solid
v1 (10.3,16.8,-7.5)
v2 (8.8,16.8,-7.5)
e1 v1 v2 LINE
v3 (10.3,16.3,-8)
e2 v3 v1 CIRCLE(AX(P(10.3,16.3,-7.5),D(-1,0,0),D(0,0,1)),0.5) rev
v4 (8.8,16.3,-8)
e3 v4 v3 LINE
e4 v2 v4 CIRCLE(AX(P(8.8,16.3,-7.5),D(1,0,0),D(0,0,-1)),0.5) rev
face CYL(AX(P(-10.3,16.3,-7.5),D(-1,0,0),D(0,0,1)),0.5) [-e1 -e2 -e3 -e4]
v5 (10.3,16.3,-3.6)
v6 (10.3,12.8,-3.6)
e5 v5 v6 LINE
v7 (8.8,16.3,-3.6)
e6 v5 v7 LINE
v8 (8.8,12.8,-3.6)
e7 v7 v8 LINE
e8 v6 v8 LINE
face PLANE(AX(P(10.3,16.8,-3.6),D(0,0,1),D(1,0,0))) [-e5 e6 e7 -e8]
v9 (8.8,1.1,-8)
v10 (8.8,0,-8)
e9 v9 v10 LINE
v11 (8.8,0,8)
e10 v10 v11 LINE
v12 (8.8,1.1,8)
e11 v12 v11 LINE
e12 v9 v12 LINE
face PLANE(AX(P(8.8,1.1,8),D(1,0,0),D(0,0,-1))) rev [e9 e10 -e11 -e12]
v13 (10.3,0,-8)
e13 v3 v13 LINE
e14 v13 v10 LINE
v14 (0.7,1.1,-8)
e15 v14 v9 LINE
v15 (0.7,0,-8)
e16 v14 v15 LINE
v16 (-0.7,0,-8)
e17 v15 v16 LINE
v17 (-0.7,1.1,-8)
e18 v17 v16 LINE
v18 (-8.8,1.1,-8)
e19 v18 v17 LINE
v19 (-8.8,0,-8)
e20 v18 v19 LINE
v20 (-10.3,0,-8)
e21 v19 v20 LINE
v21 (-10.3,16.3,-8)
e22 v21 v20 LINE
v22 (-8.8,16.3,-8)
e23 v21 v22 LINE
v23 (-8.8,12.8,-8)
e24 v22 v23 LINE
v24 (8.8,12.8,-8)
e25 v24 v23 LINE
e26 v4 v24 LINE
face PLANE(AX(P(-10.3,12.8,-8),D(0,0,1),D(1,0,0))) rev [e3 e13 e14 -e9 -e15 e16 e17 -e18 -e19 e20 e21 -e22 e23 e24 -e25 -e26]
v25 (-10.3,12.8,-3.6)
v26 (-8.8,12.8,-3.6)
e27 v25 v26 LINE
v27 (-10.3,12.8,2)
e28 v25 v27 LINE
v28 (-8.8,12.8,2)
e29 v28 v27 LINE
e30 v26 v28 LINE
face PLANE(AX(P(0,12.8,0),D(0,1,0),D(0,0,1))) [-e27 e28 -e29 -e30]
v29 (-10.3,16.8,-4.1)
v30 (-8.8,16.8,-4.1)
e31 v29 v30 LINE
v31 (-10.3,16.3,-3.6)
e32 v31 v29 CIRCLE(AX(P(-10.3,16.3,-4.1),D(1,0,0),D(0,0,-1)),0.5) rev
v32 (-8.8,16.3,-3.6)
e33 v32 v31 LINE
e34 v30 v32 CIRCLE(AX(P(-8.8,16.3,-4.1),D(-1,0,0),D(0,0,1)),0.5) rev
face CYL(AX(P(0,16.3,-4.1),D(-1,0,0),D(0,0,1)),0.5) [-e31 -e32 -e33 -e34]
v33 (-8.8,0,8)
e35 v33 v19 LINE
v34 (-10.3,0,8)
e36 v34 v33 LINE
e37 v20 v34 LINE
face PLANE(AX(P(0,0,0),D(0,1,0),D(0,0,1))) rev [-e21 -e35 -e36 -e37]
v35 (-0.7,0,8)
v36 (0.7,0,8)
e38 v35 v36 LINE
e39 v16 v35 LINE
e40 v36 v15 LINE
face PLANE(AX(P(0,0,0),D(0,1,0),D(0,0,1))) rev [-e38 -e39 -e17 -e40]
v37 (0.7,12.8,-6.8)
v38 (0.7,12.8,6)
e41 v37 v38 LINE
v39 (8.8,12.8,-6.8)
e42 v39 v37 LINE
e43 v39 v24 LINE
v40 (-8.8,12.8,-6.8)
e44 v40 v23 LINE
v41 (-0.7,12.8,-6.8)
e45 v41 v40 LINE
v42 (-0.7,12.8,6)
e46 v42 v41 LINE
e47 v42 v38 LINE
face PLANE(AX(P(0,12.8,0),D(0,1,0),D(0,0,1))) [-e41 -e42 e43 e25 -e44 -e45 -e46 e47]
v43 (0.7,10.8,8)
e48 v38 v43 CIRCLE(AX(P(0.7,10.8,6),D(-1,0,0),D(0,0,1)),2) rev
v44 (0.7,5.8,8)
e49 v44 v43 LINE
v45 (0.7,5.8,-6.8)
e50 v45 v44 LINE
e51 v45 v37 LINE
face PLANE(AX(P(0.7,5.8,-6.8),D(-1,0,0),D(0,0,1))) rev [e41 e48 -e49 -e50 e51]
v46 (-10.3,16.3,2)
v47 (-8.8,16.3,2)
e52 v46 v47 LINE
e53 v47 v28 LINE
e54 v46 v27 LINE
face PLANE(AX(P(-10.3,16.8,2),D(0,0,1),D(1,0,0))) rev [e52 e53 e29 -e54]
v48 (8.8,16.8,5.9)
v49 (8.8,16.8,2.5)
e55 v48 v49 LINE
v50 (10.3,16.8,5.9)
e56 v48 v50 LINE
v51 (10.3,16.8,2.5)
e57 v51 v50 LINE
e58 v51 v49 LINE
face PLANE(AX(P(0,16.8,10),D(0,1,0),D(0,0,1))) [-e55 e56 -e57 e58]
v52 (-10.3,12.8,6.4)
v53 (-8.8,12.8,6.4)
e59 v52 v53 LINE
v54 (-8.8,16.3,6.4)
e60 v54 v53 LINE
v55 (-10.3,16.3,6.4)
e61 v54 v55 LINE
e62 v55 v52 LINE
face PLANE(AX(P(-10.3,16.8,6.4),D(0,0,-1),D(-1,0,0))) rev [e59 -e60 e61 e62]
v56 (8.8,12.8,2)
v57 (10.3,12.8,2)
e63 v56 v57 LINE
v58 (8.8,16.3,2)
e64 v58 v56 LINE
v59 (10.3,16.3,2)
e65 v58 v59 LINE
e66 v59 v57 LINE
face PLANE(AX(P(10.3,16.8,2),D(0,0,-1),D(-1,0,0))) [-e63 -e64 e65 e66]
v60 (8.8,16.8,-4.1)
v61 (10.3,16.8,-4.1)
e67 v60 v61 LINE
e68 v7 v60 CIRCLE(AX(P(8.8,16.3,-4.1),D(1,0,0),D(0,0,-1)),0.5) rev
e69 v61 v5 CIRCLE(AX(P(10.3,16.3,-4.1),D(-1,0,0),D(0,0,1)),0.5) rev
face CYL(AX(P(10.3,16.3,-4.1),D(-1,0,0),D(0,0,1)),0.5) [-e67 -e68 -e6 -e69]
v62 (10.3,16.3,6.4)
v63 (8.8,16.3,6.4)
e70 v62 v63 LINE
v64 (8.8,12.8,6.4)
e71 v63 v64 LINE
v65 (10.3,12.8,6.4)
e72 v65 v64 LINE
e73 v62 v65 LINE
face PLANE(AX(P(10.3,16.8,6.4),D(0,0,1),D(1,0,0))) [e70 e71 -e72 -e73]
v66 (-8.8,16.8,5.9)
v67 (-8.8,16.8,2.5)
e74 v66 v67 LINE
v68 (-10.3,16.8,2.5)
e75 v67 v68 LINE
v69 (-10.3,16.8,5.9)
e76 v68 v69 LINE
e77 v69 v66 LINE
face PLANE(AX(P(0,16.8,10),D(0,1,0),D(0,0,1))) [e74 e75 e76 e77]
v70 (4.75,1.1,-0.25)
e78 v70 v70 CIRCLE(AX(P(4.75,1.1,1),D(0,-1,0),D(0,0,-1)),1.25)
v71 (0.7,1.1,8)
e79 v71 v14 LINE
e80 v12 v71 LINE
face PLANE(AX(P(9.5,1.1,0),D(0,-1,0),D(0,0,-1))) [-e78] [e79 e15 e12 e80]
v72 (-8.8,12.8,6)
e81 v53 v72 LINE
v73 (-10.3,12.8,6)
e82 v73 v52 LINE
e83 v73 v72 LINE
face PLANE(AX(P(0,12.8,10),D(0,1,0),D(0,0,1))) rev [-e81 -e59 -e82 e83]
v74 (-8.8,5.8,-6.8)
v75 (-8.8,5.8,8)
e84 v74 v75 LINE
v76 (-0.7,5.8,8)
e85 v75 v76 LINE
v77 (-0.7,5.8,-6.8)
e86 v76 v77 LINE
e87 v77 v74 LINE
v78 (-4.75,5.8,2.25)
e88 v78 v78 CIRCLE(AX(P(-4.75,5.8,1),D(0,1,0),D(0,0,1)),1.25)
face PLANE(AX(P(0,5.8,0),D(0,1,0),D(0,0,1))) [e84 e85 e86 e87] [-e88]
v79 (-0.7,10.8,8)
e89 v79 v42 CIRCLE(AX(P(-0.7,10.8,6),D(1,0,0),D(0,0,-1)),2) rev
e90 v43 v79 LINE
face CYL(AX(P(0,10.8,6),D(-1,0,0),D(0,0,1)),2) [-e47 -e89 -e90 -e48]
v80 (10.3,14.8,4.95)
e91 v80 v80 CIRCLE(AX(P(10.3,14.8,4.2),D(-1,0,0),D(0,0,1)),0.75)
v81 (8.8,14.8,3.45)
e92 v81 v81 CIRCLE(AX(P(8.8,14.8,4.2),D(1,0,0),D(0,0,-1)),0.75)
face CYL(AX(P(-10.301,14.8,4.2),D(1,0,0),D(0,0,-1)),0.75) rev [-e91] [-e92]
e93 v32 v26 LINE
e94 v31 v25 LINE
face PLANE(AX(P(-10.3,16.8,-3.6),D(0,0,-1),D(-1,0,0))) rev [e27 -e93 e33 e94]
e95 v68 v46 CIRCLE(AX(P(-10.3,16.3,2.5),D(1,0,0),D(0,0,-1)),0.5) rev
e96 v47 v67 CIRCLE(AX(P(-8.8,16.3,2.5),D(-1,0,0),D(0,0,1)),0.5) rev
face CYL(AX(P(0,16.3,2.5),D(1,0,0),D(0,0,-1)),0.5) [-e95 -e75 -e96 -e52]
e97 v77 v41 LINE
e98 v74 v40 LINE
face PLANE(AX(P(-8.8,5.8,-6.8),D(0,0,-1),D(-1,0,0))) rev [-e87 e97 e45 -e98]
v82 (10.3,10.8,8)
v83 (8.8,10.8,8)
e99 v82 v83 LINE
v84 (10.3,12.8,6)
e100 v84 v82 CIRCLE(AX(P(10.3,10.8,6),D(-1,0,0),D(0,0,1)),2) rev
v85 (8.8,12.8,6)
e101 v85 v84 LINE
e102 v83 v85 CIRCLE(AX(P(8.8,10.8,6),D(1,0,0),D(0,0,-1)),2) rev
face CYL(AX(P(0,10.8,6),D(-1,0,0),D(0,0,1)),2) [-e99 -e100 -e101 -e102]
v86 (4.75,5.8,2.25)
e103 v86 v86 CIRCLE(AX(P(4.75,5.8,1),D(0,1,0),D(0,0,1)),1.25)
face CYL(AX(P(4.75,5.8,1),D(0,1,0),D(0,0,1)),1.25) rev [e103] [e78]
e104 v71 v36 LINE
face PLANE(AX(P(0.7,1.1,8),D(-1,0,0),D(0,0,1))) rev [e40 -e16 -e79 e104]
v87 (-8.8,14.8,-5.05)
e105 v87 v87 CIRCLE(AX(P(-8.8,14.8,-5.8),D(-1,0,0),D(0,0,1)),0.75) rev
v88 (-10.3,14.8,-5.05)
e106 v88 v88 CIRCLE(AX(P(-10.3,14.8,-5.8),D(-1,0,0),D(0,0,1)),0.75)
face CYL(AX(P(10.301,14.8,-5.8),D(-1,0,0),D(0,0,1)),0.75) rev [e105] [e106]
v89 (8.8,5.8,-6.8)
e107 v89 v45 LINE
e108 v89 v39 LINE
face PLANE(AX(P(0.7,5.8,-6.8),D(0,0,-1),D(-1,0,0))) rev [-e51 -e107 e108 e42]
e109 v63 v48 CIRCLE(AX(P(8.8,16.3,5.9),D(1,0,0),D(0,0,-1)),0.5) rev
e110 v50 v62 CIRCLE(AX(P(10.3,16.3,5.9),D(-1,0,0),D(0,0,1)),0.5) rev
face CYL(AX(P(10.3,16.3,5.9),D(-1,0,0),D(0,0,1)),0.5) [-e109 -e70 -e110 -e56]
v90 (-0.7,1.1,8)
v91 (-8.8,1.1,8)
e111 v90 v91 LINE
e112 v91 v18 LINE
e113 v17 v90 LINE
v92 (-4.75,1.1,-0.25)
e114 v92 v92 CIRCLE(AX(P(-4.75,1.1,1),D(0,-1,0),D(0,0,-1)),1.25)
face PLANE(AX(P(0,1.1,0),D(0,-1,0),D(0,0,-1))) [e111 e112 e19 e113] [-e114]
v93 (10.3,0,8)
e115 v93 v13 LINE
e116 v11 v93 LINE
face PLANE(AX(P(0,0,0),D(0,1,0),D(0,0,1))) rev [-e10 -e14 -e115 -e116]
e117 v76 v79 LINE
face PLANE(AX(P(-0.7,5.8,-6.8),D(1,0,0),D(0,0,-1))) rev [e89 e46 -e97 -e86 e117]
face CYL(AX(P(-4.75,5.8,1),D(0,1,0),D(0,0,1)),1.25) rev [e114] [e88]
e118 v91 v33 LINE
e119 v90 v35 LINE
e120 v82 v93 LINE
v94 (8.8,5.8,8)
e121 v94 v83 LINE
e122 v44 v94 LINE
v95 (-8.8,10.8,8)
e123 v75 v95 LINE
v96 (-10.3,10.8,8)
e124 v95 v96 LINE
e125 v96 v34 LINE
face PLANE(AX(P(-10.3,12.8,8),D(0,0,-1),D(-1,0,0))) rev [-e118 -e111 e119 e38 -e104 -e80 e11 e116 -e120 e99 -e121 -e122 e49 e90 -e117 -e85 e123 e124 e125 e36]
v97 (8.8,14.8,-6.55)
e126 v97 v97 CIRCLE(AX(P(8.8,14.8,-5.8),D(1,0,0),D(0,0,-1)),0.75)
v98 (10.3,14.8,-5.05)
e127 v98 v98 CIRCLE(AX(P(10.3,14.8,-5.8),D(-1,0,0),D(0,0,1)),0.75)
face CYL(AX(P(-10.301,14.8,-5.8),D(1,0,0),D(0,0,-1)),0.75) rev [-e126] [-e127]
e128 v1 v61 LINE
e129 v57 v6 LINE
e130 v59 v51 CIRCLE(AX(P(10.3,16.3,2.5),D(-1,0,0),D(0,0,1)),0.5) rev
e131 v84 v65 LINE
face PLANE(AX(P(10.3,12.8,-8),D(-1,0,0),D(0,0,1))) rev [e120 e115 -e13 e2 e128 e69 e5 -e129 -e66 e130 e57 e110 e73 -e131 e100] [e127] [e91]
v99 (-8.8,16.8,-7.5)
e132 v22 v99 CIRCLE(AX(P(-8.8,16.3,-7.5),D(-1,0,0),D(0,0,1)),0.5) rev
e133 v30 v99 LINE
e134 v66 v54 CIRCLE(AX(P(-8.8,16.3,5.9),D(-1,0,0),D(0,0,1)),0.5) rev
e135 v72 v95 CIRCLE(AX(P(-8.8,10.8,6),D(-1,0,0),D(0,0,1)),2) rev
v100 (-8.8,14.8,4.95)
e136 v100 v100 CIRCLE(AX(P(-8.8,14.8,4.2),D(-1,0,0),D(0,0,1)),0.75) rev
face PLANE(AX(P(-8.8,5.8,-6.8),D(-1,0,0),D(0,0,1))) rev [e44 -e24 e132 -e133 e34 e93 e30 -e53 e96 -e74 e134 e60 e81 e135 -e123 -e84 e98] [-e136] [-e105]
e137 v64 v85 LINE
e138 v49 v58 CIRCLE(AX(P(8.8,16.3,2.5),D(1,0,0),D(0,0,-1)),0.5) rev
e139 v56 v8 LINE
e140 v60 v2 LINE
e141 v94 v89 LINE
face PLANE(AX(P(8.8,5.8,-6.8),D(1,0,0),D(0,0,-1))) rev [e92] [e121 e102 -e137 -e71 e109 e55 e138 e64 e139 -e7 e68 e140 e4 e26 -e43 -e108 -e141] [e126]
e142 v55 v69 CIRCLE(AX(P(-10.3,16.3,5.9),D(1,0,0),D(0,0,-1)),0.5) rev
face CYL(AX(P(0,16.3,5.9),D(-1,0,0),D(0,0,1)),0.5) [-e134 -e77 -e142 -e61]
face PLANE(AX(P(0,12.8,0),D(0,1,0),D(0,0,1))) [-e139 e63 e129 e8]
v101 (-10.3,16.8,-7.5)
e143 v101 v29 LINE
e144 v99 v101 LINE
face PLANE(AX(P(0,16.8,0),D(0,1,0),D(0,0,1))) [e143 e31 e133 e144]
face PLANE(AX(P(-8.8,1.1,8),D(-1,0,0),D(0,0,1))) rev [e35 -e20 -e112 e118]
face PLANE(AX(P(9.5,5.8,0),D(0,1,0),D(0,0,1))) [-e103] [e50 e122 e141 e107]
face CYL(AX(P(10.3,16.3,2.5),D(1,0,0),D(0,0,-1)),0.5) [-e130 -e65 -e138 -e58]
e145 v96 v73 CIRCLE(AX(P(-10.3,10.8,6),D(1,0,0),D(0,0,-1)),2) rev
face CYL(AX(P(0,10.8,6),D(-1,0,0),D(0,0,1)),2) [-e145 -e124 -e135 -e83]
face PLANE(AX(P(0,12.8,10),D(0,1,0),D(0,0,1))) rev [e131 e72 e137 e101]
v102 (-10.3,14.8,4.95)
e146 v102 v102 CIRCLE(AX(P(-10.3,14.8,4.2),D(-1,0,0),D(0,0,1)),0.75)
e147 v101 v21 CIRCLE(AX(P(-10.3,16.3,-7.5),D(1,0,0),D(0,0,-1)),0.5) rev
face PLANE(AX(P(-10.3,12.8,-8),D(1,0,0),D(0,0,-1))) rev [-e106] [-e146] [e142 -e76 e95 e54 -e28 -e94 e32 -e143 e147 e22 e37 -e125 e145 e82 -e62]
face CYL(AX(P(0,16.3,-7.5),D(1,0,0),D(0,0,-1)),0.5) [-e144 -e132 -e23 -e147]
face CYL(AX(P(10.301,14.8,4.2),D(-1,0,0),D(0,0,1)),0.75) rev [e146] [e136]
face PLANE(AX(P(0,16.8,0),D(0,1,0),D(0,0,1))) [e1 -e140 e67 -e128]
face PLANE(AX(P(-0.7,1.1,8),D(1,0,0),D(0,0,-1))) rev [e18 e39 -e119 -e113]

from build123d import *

# Parameters (mm, degrees)
SKETCH1_W                 = 20.6
SKETCH1_H                 = 16
BOSS_EXTRUDE1_DEPTH       = 12.8
SKETCH2_W                 = 8.1
SKETCH2_H                 = 16
BOTTOM_CUT_DEPTH          = 1.1
FILL_PATTERN1_OUTLINE_W   = 8.1
FILL_PATTERN1_OUTLINE_H   = 16
FILL_PATTERN1_DEPTH       = 1.1
FILLET1_R                 = 2
SKETCH3_W                 = 8.1
SKETCH3_H                 = 14.8
TOP_CUT_DEPTH             = 7
M3X0_5_TAPPED_HOLE1_D     = 2.5
FILL_START                = 5.8
FILL_PATTERN2_OUTLINE_W   = 8.1
FILL_PATTERN2_OUTLINE_H   = 14.8
FILL_PATTERN2_DEPTH       = 7
FILL_START_2              = 1.1
FILL_PATTERN2_2_OUTLINE_R = 1.25
FILL_PATTERN2_2_DEPTH     = 4.7
SKETCH7_W                 = 1.5
SKETCH7_H                 = 4.4
BOSS_EXTRUDE2_DEPTH       = 4
CUT_EXTRUDE1_REACH        = 29.76
SKETCH8_R                 = 0.75
FILLET2_R                 = 0.5
LPATTERN1_COUNT           = 2
LPATTERN1_PITCH           = 10
FILLET2_OF_LPATTERN1_R    = 0.5
MIRROR1_START             = 8.8
MIRROR1_OUTLINE_R         = 0.75
MIRROR1_DEPTH             = 1.5


# Read off the part's stored shape, not the designer's step: Fill Pattern1, Fill Pattern2, Mirror1
with BuildPart() as part:
    # Sketch1 → Boss-Extrude1 (new body)
    with BuildSketch(Plane(origin=(0, 0, 0), x_dir=(1, 0, 0), z_dir=(0, 1, 0))):
        Rectangle(SKETCH1_W, SKETCH1_H)
    extrude(amount=BOSS_EXTRUDE1_DEPTH)

    # Sketch2 → BOTTOM CUT (cut)
    with BuildSketch(Plane.XZ):
        with Locations((-4.75, 0)):
            Rectangle(SKETCH2_W, SKETCH2_H)
    extrude(amount=-BOTTOM_CUT_DEPTH, mode=Mode.SUBTRACT)

    # Fill Pattern1 outline → Fill Pattern1 (cut)
    with BuildSketch(Plane(origin=(0, 0, 0), x_dir=(1, 0, 0), z_dir=(0, 1, 0))):
        with Locations((4.75, 0)):
            Rectangle(FILL_PATTERN1_OUTLINE_W, FILL_PATTERN1_OUTLINE_H)
    extrude(amount=FILL_PATTERN1_DEPTH, mode=Mode.SUBTRACT)

    # Fillet1
    fillet1_edges = [part.edges().sort_by_distance(p)[0] for p in [
        (0, 12.8, 8),
    ]]
    fillet(fillet1_edges, radius=FILLET1_R)

    # Sketch3 → TOP CUT (cut)
    with BuildSketch(Plane(origin=(0, 12.8, 0), x_dir=(1, 0, 0), z_dir=(0, 1, 0))):
        with Locations((-4.75, -0.6)):
            Rectangle(SKETCH3_W, SKETCH3_H)
    extrude(amount=-TOP_CUT_DEPTH, mode=Mode.SUBTRACT)

    # M3x0.5 Tapped Hole1 (through all)
    with Locations(Plane(origin=(0, 5.8, 0), x_dir=(1, 0, 0), z_dir=(0, 1, 0))):
        with Locations((-4.75, -1)):
            Hole(M3X0_5_TAPPED_HOLE1_D / 2)

    # Fill Pattern2 outline → Fill Pattern2 (cut)
    with BuildSketch(Plane(origin=(0, 0, 0), x_dir=(1, 0, 0), z_dir=(0, 1, 0)).offset(FILL_START)):
        with Locations((4.75, -0.6)):
            Rectangle(FILL_PATTERN2_OUTLINE_W, FILL_PATTERN2_OUTLINE_H)
    extrude(amount=FILL_PATTERN2_DEPTH, mode=Mode.SUBTRACT)

    # Fill Pattern2 2 outline → Fill Pattern2 2 (cut)
    with BuildSketch(Plane(origin=(0, 0, 0), x_dir=(1, 0, 0), z_dir=(0, 1, 0)).offset(FILL_START_2)):
        with Locations((4.75, -1)):
            Circle(FILL_PATTERN2_2_OUTLINE_R)
    extrude(amount=FILL_PATTERN2_2_DEPTH, mode=Mode.SUBTRACT)

    # Sketch7 → Boss-Extrude2 (add)
    with BuildSketch(Plane(origin=(0, 12.8, 0), x_dir=(1, 0, 0), z_dir=(0, 1, 0))):
        with Locations((-9.55, 5.8)):
            Rectangle(SKETCH7_W, SKETCH7_H)
    boss_extrude2 = extrude(amount=BOSS_EXTRUDE2_DEPTH)

    # Sketch8 → Cut-Extrude1 (cut, up to next)
    with BuildSketch(Plane.ZY.offset(10.3), mode=Mode.PRIVATE) as cut_extrude1_sk1:
        with Locations((-5.8, 14.8)):
            Circle(SKETCH8_R)
    cut_extrude1_tool1 = extrude(cut_extrude1_sk1.sketch, amount=-CUT_EXTRUDE1_REACH, mode=Mode.PRIVATE) & part.part
    cut_extrude1 = cut_extrude1_tool1.solids().sort_by_distance((-10.3, 14.8, -5.8))[0]
    add(cut_extrude1, mode=Mode.SUBTRACT)

    # Fillet2
    fillet2_edges = [part.edges().sort_by_distance(p)[0] for p in [
        (-9.55, 16.8, -3.6),
        (-9.55, 16.8, -8),
    ]]
    fillet(fillet2_edges, radius=FILLET2_R)

    # LPattern1: Boss-Extrude2, Cut-Extrude1 ×2
    with Locations(*[(0, 0, i * LPATTERN1_PITCH) for i in range(1, LPATTERN1_COUNT)]):
        add(boss_extrude2)
        add(cut_extrude1, mode=Mode.SUBTRACT)

    # Fillet2 of LPattern1
    fillet2_of_lpattern1_edges = [part.edges().sort_by_distance(p)[0] for p in [
        (-9.55, 16.8, 6.4),
        (-9.55, 16.8, 2),
    ]]
    fillet(fillet2_of_lpattern1_edges, radius=FILLET2_OF_LPATTERN1_R)

    # Mirror1 outline → Mirror1 (add)
    # profile 1 of 2: a face of its own
    with BuildSketch(Plane.YZ.offset(MIRROR1_START)):
        with BuildLine():
            ThreePointArc((16.8, -4.1), (16.653553391, -3.746446609), (16.3, -3.6))
            Line((16.3, -3.6), (12.8, -3.6))
            Line((12.8, -3.6), (12.8, -8))
            Line((12.8, -8), (16.3, -8))
            ThreePointArc((16.3, -8), (16.653553391, -7.853553391), (16.8, -7.5))
            Line((16.8, -7.5), (16.8, -4.1))
        make_face()
        with Locations((14.8, -5.8)):
            Circle(MIRROR1_OUTLINE_R, mode=Mode.SUBTRACT)
    # profile 2 of 2: a face of its own
    with BuildSketch(Plane.YZ.offset(MIRROR1_START)):
        with BuildLine():
            Line((12.8, 6.4), (12.8, 2))
            Line((12.8, 2), (16.3, 2))
            ThreePointArc((16.3, 2), (16.653553391, 2.146446609), (16.8, 2.5))
            Line((16.8, 2.5), (16.8, 5.9))
            ThreePointArc((16.8, 5.9), (16.653553391, 6.253553391), (16.3, 6.4))
            Line((16.3, 6.4), (12.8, 6.4))
        make_face()
        with Locations((14.8, 4.2)):
            Circle(MIRROR1_OUTLINE_R, mode=Mode.SUBTRACT)
    extrude(amount=MIRROR1_DEPTH)


solid = part.part
